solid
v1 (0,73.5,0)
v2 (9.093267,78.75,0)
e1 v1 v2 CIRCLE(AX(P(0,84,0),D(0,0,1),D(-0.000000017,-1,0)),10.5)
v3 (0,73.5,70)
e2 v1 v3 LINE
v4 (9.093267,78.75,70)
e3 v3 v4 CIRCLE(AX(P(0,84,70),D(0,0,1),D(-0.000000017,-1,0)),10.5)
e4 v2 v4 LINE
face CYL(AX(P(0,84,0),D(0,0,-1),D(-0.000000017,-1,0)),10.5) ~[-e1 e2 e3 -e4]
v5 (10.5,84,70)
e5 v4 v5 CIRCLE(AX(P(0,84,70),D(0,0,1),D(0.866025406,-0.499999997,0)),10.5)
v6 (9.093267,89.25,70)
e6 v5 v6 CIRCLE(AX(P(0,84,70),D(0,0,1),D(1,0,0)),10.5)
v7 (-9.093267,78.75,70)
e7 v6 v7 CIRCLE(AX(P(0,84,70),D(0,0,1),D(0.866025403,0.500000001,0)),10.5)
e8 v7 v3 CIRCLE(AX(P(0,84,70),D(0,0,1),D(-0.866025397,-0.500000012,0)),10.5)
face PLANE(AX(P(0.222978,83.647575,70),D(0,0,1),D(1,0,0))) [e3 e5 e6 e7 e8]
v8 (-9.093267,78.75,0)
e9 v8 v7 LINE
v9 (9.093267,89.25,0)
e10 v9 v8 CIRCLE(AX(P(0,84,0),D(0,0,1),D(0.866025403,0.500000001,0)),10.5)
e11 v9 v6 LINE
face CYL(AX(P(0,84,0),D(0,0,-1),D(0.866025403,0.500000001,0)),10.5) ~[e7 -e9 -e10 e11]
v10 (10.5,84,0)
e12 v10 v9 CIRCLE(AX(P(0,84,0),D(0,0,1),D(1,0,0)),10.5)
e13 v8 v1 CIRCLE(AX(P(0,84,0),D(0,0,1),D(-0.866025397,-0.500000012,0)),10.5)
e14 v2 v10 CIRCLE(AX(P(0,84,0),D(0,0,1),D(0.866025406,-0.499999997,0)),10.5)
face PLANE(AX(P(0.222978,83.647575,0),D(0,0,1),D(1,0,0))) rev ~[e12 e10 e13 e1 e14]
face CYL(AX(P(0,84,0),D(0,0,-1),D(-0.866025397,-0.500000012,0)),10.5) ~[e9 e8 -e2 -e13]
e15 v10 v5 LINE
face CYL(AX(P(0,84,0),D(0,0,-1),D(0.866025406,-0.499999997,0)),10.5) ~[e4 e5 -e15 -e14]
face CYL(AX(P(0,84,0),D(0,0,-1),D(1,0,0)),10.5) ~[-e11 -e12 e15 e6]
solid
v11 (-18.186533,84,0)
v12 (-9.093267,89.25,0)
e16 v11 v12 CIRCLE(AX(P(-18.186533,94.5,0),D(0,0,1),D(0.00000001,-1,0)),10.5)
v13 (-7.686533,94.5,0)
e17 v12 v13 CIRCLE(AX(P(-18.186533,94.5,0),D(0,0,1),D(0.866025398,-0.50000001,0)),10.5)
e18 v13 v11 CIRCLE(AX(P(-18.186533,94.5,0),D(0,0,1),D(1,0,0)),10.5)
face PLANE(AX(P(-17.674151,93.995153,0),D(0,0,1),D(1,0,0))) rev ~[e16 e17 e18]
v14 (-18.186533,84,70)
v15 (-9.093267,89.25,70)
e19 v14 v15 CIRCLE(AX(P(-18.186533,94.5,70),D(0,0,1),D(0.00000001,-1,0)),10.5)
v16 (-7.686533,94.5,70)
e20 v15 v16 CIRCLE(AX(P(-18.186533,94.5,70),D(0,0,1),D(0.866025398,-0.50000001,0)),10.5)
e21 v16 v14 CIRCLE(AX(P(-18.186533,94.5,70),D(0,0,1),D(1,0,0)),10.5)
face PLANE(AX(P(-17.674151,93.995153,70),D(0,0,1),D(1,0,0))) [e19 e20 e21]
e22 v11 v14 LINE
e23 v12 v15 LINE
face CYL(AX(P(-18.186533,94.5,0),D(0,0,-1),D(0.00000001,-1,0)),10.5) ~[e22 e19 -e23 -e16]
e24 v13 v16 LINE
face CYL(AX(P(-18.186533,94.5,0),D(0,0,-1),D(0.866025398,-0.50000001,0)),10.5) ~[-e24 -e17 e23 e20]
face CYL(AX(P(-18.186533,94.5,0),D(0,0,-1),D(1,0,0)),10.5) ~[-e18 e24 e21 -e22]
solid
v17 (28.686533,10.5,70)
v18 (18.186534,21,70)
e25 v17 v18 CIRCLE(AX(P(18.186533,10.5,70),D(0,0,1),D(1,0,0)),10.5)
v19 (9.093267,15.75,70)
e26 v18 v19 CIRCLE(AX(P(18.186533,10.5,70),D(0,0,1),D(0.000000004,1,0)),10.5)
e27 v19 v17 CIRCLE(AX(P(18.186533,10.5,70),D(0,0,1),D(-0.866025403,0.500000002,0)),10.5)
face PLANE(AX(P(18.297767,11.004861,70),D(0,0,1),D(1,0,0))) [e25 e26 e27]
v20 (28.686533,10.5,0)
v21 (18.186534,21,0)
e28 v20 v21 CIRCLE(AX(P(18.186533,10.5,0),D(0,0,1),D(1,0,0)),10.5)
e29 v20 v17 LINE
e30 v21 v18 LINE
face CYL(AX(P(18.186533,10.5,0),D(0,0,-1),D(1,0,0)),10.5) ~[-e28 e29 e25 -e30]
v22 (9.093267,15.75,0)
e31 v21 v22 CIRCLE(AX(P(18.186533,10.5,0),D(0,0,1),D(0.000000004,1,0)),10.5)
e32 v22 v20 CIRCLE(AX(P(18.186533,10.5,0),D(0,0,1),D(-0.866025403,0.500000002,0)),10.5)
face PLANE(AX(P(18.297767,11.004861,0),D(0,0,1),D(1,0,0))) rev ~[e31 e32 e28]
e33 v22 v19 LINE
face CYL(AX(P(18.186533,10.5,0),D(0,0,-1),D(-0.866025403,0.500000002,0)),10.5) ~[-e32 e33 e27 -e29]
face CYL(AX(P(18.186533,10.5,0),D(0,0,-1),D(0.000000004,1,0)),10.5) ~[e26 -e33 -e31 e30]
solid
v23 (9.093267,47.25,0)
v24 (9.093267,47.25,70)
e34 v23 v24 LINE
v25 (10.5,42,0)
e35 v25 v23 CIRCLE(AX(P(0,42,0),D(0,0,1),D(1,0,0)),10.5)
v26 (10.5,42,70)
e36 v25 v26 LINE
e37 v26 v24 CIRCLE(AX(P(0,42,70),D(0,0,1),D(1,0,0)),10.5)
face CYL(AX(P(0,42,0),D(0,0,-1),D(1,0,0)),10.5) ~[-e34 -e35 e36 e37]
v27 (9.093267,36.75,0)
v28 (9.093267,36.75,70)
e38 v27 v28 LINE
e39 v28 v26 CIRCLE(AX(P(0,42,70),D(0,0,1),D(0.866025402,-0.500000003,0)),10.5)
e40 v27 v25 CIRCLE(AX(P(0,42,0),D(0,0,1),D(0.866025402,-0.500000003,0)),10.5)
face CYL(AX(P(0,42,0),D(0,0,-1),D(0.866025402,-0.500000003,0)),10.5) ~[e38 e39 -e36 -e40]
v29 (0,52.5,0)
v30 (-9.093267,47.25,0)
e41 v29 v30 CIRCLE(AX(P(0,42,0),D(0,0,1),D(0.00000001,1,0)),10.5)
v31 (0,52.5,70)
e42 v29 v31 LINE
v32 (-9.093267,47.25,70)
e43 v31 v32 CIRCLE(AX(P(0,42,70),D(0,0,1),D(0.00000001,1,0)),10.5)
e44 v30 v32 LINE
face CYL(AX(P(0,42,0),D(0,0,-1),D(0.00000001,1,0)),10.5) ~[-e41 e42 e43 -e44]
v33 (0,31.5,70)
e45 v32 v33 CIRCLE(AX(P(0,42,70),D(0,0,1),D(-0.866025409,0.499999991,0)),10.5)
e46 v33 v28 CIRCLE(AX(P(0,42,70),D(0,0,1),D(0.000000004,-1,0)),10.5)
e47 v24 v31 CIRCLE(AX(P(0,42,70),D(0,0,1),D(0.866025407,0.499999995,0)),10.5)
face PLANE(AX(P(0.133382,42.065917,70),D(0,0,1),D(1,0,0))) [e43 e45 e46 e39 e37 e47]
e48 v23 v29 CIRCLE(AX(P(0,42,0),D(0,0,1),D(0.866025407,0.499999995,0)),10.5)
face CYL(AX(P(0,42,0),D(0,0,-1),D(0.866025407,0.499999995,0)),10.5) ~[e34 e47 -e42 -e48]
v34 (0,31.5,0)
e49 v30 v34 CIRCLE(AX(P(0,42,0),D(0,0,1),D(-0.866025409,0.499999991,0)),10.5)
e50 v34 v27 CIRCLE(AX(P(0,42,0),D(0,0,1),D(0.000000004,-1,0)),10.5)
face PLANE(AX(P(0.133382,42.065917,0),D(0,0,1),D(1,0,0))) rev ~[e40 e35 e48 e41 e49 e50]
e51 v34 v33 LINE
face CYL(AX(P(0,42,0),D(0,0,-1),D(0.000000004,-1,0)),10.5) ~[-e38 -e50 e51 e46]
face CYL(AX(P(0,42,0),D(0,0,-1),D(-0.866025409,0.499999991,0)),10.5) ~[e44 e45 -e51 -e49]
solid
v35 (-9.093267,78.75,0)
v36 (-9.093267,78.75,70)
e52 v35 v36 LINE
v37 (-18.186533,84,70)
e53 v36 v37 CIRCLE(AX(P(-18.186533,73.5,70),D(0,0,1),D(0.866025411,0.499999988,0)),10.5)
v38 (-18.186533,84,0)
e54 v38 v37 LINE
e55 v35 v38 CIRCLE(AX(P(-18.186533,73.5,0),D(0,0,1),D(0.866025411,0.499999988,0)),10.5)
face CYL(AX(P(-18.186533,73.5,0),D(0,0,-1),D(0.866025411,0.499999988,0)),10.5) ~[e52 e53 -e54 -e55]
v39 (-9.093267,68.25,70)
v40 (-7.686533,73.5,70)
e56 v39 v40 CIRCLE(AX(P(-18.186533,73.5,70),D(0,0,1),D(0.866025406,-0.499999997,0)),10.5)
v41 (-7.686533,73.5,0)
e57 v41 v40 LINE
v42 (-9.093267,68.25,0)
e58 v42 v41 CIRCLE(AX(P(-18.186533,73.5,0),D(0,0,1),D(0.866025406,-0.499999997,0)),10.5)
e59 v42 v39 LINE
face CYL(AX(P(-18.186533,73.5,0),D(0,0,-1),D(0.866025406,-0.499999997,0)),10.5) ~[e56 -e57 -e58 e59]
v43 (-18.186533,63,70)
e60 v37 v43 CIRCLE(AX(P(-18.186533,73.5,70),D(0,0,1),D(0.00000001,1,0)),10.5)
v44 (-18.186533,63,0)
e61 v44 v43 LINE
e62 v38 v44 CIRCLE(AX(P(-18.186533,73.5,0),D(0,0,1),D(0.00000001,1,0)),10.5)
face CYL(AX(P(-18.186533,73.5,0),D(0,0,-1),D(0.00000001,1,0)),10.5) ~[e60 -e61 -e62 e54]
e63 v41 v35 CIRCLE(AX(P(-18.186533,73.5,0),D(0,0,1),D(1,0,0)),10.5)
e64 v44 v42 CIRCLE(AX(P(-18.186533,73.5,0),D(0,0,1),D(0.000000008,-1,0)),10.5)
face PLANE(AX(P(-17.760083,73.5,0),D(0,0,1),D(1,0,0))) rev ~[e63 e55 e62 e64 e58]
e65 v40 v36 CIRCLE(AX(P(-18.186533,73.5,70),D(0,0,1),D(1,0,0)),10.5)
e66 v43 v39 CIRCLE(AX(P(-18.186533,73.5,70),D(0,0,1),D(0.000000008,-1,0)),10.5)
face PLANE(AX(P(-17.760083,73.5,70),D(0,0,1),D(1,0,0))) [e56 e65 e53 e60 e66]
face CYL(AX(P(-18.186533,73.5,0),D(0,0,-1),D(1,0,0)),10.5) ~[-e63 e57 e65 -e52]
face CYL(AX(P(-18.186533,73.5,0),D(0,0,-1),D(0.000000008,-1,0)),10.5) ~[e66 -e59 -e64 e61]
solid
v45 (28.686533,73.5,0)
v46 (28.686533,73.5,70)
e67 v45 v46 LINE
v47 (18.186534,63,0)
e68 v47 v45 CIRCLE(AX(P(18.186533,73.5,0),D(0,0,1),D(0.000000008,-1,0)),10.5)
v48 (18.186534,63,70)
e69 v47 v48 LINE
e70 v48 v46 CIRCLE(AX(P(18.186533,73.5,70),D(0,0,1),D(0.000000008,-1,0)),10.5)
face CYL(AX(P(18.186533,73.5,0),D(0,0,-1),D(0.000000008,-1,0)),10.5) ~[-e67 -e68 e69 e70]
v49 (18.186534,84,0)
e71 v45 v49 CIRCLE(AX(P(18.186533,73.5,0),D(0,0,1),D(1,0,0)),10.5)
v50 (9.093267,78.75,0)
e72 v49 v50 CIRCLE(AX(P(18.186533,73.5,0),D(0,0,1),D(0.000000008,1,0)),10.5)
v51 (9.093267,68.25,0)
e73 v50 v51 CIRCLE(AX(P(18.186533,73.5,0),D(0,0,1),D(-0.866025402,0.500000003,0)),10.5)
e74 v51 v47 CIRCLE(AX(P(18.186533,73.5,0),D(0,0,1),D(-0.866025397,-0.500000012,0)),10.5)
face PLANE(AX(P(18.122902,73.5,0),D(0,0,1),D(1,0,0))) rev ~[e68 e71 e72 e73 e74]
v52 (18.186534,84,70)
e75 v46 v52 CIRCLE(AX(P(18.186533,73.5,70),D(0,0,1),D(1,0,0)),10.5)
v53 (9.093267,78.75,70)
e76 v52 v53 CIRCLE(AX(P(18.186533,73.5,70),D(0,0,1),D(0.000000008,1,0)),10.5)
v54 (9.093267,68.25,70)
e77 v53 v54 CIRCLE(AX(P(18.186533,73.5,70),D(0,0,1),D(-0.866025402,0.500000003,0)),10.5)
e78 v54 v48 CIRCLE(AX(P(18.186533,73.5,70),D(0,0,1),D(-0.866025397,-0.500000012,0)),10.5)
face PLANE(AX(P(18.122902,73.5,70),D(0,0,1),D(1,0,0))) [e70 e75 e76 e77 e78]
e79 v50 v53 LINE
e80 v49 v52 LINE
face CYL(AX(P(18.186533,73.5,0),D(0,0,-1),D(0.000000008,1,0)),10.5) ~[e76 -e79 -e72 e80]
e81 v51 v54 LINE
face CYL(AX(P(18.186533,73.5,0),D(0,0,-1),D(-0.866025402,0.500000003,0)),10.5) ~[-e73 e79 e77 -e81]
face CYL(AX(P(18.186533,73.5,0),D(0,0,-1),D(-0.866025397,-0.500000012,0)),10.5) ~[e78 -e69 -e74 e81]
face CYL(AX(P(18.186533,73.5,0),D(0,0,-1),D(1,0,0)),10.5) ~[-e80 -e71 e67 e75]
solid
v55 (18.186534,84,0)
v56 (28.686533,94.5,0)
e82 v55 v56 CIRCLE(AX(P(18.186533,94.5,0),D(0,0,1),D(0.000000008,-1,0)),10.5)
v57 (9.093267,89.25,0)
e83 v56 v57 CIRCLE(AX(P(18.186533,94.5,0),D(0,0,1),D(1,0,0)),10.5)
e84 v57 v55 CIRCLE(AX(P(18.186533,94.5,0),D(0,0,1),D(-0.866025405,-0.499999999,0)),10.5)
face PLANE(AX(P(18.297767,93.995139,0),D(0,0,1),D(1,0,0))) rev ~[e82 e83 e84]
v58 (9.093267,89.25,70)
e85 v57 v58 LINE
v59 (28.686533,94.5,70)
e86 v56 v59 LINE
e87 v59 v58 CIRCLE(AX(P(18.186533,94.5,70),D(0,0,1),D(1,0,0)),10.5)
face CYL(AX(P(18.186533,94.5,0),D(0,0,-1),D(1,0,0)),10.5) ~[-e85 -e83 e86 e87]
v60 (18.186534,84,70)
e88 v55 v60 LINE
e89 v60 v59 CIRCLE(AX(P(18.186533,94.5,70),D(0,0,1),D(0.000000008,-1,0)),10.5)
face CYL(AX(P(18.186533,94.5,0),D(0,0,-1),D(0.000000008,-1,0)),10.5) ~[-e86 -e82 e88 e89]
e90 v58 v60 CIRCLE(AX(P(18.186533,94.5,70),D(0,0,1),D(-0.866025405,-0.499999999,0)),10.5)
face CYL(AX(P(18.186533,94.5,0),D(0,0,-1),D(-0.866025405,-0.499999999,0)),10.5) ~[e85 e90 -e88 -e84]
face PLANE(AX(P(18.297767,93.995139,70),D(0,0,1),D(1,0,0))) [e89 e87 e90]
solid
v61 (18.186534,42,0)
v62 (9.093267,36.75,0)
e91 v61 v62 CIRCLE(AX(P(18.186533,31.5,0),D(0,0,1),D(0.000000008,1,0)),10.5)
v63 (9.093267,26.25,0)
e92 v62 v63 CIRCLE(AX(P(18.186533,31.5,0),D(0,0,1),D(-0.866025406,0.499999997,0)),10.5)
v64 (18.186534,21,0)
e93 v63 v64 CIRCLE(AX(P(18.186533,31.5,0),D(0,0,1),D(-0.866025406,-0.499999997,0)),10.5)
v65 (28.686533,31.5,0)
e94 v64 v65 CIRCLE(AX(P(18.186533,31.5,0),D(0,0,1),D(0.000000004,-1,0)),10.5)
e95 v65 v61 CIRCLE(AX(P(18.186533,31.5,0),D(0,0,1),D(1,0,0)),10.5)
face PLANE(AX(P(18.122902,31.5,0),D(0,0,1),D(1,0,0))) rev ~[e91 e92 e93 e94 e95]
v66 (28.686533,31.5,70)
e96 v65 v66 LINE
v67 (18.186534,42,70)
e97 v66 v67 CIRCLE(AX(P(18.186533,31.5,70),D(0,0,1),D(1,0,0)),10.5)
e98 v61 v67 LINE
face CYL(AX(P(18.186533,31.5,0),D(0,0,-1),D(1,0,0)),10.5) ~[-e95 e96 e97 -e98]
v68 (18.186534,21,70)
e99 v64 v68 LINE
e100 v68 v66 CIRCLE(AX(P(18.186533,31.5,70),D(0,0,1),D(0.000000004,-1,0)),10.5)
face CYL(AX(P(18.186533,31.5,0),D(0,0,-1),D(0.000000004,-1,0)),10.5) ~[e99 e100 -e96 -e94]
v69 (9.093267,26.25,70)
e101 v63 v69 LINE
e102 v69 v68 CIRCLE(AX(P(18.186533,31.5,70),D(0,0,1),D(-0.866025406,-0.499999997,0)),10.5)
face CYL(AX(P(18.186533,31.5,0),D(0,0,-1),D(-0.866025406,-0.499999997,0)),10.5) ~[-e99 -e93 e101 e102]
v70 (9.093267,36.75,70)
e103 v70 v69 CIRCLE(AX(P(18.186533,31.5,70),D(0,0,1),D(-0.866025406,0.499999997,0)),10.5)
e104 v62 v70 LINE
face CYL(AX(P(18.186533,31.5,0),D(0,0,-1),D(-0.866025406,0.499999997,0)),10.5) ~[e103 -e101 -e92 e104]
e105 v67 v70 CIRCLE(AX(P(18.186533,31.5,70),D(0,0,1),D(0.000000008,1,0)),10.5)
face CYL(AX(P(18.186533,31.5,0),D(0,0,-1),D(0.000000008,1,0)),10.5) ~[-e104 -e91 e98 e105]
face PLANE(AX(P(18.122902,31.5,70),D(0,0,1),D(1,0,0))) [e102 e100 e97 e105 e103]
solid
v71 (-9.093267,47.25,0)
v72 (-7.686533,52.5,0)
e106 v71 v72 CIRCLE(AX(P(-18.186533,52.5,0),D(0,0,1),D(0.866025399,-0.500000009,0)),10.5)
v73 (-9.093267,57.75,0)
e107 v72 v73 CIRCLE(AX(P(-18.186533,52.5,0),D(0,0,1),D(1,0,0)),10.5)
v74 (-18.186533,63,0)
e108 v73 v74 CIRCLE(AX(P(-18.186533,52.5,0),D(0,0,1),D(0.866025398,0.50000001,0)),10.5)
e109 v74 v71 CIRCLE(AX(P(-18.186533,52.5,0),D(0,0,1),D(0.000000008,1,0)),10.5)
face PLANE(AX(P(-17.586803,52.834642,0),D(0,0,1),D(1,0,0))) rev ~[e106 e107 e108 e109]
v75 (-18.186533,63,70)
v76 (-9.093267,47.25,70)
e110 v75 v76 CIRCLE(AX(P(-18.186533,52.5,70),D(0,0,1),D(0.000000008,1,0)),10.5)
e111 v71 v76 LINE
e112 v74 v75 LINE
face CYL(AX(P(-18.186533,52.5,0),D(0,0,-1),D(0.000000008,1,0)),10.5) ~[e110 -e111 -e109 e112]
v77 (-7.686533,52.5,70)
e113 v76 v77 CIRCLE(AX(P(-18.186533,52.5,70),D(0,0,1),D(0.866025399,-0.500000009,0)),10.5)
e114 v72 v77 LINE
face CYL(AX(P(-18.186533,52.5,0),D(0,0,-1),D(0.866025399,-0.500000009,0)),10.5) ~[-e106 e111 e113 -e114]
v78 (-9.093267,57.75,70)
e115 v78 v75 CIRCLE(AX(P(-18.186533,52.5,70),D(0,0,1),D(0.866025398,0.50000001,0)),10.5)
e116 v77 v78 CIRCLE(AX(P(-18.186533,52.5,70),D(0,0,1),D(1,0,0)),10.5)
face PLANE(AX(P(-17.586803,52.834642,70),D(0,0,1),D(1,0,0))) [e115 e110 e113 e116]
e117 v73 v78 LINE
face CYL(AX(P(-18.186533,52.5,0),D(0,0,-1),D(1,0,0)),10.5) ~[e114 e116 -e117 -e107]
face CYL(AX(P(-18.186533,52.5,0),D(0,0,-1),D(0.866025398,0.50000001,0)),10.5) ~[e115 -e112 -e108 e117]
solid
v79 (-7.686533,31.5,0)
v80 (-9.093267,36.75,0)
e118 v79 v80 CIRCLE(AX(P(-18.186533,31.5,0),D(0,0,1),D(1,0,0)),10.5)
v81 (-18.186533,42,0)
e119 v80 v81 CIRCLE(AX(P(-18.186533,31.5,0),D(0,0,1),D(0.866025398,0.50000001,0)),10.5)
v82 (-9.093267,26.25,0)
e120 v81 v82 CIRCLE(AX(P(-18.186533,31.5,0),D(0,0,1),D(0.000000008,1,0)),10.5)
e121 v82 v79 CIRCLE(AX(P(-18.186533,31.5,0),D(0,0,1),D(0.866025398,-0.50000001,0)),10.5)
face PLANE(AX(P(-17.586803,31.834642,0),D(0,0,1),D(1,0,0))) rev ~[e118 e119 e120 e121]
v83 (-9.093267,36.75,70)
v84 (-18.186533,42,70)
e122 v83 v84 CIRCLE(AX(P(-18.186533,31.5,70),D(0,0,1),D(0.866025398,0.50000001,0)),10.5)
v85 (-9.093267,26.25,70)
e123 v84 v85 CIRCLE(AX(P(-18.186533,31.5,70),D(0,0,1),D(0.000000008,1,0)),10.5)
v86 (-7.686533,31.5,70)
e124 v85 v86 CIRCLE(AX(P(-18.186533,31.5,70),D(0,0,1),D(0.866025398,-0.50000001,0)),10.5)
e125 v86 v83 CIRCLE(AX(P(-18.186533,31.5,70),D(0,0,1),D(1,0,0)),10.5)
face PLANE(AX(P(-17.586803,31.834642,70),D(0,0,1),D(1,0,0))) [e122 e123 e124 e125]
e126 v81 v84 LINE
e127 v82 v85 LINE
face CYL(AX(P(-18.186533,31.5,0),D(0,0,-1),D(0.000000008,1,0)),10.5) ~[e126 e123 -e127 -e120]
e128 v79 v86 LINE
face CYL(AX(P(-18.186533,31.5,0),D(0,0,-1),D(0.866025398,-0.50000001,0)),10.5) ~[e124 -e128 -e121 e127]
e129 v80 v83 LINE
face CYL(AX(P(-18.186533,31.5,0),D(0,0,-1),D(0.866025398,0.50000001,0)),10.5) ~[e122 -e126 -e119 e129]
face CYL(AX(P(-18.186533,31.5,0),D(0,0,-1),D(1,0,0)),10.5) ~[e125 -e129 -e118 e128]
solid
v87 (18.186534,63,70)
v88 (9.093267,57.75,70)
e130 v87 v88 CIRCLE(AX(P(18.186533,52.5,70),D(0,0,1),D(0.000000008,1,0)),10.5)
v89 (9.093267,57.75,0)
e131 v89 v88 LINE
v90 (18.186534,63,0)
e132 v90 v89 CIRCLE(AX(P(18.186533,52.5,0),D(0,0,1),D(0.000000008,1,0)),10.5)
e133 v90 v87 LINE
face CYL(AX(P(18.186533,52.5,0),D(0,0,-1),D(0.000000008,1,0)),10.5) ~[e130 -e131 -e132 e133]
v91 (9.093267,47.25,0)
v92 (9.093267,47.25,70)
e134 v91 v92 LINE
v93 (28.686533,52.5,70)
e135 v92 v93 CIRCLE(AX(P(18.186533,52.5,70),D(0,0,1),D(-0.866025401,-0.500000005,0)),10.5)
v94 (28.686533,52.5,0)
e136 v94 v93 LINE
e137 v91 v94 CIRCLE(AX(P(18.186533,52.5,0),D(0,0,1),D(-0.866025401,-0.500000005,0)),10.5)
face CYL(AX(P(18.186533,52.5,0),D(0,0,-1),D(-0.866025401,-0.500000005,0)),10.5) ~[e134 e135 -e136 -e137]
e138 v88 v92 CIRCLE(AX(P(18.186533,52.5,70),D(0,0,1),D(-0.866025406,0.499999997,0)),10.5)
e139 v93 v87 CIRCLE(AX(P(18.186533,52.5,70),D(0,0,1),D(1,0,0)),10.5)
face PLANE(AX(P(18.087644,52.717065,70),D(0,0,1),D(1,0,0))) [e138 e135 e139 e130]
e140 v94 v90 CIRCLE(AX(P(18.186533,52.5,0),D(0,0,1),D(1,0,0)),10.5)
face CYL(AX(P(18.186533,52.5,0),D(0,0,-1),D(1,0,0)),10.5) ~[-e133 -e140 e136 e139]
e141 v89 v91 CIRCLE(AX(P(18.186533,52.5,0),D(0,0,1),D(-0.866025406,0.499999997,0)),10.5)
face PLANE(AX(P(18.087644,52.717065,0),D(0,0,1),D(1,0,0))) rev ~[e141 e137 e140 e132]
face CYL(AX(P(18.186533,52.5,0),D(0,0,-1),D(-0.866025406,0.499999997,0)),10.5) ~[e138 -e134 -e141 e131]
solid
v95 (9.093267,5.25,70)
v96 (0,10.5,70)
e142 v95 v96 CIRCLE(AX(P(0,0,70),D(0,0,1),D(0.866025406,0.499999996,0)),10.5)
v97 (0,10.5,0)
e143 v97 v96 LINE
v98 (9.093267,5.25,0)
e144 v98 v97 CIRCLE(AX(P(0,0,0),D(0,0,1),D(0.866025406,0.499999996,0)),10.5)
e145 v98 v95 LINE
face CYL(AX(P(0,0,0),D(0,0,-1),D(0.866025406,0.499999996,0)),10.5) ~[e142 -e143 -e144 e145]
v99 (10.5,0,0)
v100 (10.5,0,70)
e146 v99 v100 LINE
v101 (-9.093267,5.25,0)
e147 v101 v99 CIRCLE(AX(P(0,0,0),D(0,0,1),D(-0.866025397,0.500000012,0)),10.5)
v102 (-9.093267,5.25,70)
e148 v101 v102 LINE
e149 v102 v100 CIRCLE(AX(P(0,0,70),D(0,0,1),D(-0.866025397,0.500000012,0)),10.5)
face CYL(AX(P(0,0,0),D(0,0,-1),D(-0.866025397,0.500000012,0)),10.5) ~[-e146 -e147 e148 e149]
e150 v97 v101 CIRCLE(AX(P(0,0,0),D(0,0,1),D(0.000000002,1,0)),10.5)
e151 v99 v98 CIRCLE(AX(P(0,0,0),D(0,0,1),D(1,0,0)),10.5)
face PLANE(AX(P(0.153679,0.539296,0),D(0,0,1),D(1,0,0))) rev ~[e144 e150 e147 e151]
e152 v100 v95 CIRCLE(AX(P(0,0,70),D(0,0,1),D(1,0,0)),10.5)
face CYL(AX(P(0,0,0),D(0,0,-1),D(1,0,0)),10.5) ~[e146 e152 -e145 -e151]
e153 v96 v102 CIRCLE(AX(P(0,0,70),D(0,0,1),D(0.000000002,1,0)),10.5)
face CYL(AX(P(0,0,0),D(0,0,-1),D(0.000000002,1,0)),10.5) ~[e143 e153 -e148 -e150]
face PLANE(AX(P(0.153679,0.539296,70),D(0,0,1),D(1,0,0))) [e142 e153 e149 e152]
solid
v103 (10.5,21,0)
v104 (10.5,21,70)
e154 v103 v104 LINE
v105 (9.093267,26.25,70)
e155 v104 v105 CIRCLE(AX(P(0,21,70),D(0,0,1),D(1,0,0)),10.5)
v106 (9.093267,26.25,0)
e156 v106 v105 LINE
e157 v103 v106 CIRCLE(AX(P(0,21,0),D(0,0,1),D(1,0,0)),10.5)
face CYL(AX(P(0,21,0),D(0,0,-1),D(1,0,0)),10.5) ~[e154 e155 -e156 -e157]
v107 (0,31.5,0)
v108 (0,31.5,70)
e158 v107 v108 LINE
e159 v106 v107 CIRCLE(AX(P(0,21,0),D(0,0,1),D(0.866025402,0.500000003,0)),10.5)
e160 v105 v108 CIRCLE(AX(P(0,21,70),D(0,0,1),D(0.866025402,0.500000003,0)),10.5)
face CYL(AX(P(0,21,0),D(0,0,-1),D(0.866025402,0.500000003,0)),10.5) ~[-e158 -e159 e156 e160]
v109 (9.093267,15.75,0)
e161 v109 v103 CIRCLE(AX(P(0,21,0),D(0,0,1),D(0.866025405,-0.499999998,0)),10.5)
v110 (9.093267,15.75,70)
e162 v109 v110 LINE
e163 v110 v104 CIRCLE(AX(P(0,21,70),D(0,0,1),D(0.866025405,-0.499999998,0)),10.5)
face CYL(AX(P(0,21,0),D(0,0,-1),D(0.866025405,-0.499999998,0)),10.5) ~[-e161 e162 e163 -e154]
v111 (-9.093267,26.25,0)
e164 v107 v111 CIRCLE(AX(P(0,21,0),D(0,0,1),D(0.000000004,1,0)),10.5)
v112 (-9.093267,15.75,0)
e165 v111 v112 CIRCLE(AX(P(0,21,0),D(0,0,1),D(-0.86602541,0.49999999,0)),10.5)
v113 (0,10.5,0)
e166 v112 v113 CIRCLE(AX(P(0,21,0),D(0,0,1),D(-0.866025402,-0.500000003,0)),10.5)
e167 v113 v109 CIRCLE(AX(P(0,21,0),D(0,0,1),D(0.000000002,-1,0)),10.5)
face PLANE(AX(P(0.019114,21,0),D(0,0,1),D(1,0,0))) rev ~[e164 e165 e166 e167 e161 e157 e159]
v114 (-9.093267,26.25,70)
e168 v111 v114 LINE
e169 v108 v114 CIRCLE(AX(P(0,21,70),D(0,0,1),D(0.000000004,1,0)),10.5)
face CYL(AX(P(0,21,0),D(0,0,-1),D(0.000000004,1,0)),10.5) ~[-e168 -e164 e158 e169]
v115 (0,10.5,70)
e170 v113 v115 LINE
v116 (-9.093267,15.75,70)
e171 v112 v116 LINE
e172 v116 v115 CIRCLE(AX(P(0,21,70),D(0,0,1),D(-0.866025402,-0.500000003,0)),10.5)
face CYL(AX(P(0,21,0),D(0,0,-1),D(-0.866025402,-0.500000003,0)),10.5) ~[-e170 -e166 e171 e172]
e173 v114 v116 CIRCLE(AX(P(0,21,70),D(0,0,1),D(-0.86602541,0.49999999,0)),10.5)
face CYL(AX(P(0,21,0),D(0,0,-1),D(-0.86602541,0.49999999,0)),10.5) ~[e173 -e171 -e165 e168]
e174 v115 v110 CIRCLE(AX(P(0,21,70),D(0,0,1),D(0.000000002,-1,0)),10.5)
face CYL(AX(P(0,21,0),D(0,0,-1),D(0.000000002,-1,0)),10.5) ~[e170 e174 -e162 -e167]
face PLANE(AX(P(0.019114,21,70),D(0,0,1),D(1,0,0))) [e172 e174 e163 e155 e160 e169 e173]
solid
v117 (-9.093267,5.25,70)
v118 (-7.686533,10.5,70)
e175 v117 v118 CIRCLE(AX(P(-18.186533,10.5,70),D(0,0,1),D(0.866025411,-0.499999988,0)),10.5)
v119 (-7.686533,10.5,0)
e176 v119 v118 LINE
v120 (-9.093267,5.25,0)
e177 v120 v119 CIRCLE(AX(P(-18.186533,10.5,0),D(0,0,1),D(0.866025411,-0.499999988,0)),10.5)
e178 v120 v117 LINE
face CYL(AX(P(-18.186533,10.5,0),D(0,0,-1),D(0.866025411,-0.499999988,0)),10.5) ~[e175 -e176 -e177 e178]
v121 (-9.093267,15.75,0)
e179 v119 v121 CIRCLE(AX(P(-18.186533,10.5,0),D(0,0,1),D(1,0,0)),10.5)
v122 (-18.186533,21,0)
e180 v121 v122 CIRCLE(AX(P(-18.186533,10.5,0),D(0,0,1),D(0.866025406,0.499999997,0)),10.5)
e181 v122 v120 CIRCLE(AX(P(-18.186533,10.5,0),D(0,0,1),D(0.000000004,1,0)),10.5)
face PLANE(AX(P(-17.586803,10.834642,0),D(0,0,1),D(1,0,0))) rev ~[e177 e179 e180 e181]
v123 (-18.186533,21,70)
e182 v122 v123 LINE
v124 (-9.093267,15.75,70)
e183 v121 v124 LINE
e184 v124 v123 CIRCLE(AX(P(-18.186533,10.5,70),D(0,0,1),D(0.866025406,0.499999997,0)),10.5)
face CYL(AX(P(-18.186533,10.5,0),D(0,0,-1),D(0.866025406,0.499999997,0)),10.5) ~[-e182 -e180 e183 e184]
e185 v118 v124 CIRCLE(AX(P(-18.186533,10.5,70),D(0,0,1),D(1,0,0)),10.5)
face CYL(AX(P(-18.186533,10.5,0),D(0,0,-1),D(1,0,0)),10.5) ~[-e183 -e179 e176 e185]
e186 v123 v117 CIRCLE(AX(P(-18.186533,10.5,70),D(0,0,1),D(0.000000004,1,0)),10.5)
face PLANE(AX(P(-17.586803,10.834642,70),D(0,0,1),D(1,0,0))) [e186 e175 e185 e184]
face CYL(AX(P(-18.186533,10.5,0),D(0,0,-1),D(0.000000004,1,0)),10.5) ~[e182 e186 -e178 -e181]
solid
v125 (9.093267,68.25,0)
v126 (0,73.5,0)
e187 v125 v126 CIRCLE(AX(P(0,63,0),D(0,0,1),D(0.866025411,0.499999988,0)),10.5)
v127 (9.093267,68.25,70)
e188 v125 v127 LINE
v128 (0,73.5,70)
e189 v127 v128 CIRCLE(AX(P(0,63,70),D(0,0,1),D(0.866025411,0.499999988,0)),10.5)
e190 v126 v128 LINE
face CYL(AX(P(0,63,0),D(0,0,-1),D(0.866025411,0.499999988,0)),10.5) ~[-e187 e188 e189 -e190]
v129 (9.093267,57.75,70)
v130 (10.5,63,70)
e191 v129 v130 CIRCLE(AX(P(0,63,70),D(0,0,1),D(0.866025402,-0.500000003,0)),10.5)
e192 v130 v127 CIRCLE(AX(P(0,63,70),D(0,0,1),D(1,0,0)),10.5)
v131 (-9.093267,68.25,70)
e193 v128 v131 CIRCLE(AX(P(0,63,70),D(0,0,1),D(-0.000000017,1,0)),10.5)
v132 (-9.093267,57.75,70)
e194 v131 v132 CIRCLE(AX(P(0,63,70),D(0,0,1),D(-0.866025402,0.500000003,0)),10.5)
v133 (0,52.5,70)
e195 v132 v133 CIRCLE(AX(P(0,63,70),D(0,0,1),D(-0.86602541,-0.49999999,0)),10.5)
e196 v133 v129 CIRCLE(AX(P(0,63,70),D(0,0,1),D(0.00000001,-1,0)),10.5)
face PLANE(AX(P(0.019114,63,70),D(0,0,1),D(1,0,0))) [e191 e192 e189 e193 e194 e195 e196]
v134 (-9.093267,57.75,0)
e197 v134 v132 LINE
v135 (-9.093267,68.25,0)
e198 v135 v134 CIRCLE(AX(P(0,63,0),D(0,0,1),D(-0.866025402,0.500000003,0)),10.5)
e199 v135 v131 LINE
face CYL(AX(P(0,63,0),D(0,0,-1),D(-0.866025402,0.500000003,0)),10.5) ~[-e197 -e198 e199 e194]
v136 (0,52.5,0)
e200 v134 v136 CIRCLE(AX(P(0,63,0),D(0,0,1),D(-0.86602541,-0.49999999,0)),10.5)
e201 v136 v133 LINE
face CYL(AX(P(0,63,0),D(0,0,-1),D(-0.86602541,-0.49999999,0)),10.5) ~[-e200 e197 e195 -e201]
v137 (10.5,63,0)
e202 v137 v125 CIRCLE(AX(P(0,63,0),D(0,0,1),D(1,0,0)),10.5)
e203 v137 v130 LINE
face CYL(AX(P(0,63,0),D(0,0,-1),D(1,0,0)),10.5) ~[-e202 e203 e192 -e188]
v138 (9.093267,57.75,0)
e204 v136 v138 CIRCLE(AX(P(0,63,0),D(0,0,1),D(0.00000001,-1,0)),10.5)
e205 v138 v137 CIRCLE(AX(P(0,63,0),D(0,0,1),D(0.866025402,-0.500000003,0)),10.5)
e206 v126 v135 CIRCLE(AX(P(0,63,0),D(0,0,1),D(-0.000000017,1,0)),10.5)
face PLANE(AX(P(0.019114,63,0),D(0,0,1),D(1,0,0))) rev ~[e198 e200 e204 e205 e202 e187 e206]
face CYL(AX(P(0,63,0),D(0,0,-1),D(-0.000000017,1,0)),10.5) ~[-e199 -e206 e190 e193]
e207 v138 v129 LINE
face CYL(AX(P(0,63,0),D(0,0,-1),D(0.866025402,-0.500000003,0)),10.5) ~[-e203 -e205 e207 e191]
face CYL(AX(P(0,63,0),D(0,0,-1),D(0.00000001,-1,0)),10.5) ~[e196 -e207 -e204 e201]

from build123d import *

# Parameters (mm, degrees)
F1_DEPTH = 70


# Not quite as in the source:
# - a feature names something its author has since deleted; it is built from what else it names


with BuildPart() as f1:
    # F0 (on Top) → F1 (new body)
    with BuildSketch(Plane.XY):
        with BuildLine():
            ThreePointArc((-9.0932666667, 5.2500001264), (-2.7176000441, -10.1422211571), (10.5, 0))
            ThreePointArc((10.5, 0), (10.1422211824, 2.71759995), (9.0932667642, 5.2499999577))
            ThreePointArc((9.0932667642, 5.2499999577), (5.2500000295, 9.0932667227), (1.93e-08, 10.5))
            ThreePointArc((1.93e-08, 10.5), (-5.2499999284, 9.0932667811), (-9.0932666667, 5.2500001264))
        make_face()
    extrude(amount=F1_DEPTH)


with BuildPart() as f1b:
    # F0 (on Top) → F1, piece 2 (new body)
    with BuildSketch(Plane.XY):
        with BuildLine():
            ThreePointArc((9.0932667504, 15.7500000185), (7.6865334795, 10.4999999862), (9.0932667642, 5.2499999577))
            ThreePointArc((9.0932667642, 5.2499999577), (20.9041334767, 0.3577788303), (28.6865334795, 10.5))
            ThreePointArc((28.6865334795, 10.5), (25.6111546956, 17.9246211888), (18.1865335182, 21))
            ThreePointArc((18.1865335182, 21), (12.9365335055, 19.5932667547), (9.0932667504, 15.7500000185))
        make_face()
    extrude(amount=F1_DEPTH)


with BuildPart() as f1c:
    # F0 (on Top) → F1, piece 3 (new body)
    with BuildSketch(Plane.XY):
        with BuildLine():
            ThreePointArc((-18.1865334408, 21), (-27.2798001924, 5.2499999535), (-9.0932666667, 5.2500001264))
            ThreePointArc((-9.0932666667, 5.2500001264), (-8.0443122845, 7.7824000969), (-7.6865334795, 10.5))
            ThreePointArc((-7.6865334795, 10.5), (-8.0443122981, 13.2175999536), (-9.0932667191, 15.7499999643))
            ThreePointArc((-9.0932667191, 15.7499999643), (-12.9365334449, 19.5932667197), (-18.1865334408, 21))
        make_face()
    extrude(amount=F1_DEPTH)


with BuildPart() as f1d:
    # F0 (on Top) → F1, piece 4 (new body)
    with BuildSketch(Plane.XY):
        with BuildLine():
            ThreePointArc((-9.0932667191, 15.7499999643), (-5.2499999738, 11.9067332451), (1.93e-08, 10.5))
            ThreePointArc((1.93e-08, 10.5), (5.2500000176, 11.9067332704), (9.0932667504, 15.7500000185))
            ThreePointArc((9.0932667504, 15.7500000185), (10.1422211788, 18.2824000367), (10.5, 21))
            ThreePointArc((10.5, 21), (10.1422211707, 23.7175999935), (9.0932667191, 26.2500000357))
            ThreePointArc((9.0932667191, 26.2500000357), (5.2499999989, 30.0932667404), (3.87e-08, 31.5))
            ThreePointArc((3.87e-08, 31.5), (-5.2500000363, 30.0932667188), (-9.093266801, 26.2499998939))
            ThreePointArc((-9.093266801, 26.2499998939), (-10.5, 20.9999999181), (-9.0932667191, 15.7499999643))
        make_face()
    extrude(amount=F1_DEPTH)


with BuildPart() as f1e:
    # F0 (on Top) → F1, piece 5 (new body)
    with BuildSketch(Plane.XY):
        with BuildLine():
            ThreePointArc((-18.1865333975, 42), (-28.6865334795, 31.5000000216), (-18.1865334408, 21))
            ThreePointArc((-18.1865334408, 21), (-12.9365335158, 22.4067332393), (-9.093266801, 26.2499998939))
            ThreePointArc((-9.093266801, 26.2499998939), (-8.0443123193, 28.7823999672), (-7.6865334795, 31.5))
            ThreePointArc((-7.6865334795, 31.5), (-8.0443123193, 34.2176000328), (-9.093266801, 36.7500001061))
            ThreePointArc((-9.093266801, 36.7500001061), (-12.9365334971, 40.5932667499), (-18.1865333975, 42))
        make_face()
    extrude(amount=F1_DEPTH)


with BuildPart() as f1f:
    # F0 (on Top) → F1, piece 6 (new body)
    with BuildSketch(Plane.XY):
        with BuildLine():
            ThreePointArc((9.0932667191, 26.2500000357), (12.9365334784, 22.4067332609), (18.1865335182, 21))
            ThreePointArc((18.1865335182, 21), (25.6111546956, 24.0753788112), (28.6865334795, 31.5))
            ThreePointArc((28.6865334795, 31.5), (25.6111547109, 38.9246211735), (18.1865335614, 42))
            ThreePointArc((18.1865335614, 42), (12.9365334971, 40.5932667499), (9.0932667191, 36.7499999643))
            ThreePointArc((9.0932667191, 36.7499999643), (7.6865334795, 31.5), (9.0932667191, 26.2500000357))
        make_face()
    extrude(amount=F1_DEPTH)


with BuildPart() as f1g:
    # F0 (on Top) → F1, piece 7 (new body)
    with BuildSketch(Plane.XY):
        with BuildLine():
            ThreePointArc((-18.1865333975, 63), (-28.6865334795, 52.5), (-18.1865333975, 42))
            ThreePointArc((-18.1865333975, 42), (-12.9365334907, 43.4067332538), (-9.0932667937, 47.2499999066))
            ThreePointArc((-9.0932667937, 47.2499999066), (-8.0443123174, 49.7823999743), (-7.6865334795, 52.5))
            ThreePointArc((-7.6865334795, 52.5), (-8.0443123193, 55.2176000328), (-9.093266801, 57.7500001061))
            ThreePointArc((-9.093266801, 57.7500001061), (-12.9365334971, 61.5932667499), (-18.1865333975, 63))
        make_face()
    extrude(amount=F1_DEPTH)


with BuildPart() as f1h:
    # F0 (on Top) → F1, piece 8 (new body)
    with BuildSketch(Plane.XY):
        with BuildLine():
            ThreePointArc((-9.0932667937, 47.2499999066), (-10.5, 42.0000000074), (-9.093266801, 36.7500001061))
            ThreePointArc((-9.093266801, 36.7500001061), (-5.2500000363, 32.9067332812), (3.87e-08, 31.5))
            ThreePointArc((3.87e-08, 31.5), (5.2499999989, 32.9067332596), (9.0932667191, 36.7499999643))
            ThreePointArc((9.0932667191, 36.7499999643), (10.1422211707, 39.2824000065), (10.5, 42))
            ThreePointArc((10.5, 42), (10.1422211838, 44.7175999446), (9.0932667697, 47.2499999481))
            ThreePointArc((9.0932667697, 47.2499999481), (5.2500000697, 51.0932666995), (1.009e-07, 52.5))
            ThreePointArc((1.009e-07, 52.5), (-5.250000003, 51.093266738), (-9.0932667937, 47.2499999066))
        make_face()
    extrude(amount=F1_DEPTH)


with BuildPart() as f1i:
    # F0 (on Top) → F1, piece 9 (new body)
    with BuildSketch(Plane.XY):
        with BuildLine():
            ThreePointArc((-18.1865333708, 84), (-28.6865334795, 73.5000000134), (-18.1865333975, 63))
            ThreePointArc((-18.1865333975, 63), (-12.9365334261, 64.4067332911), (-9.0932667191, 68.2500000357))
            ThreePointArc((-9.0932667191, 68.2500000357), (-8.0443122981, 70.7824000464), (-7.6865334795, 73.5))
            ThreePointArc((-7.6865334795, 73.5), (-8.0443122842, 76.2175999018), (-9.0932666654, 78.7499998713))
            ThreePointArc((-9.0932666654, 78.7499998713), (-12.936533368, 82.5932666754), (-18.1865333708, 84))
        make_face()
    extrude(amount=F1_DEPTH)


with BuildPart() as f1j:
    # F0 (on Top) → F1, piece 10 (new body)
    with BuildSketch(Plane.XY):
        with BuildLine():
            ThreePointArc((9.0932667697, 47.2499999481), (12.9365335409, 43.4067332248), (18.1865335614, 42))
            ThreePointArc((18.1865335614, 42), (25.6111547109, 45.0753788265), (28.6865334795, 52.5))
            ThreePointArc((28.6865334795, 52.5), (25.6111547109, 59.9246211735), (18.1865335614, 63))
            ThreePointArc((18.1865335614, 63), (12.9365334971, 61.5932667499), (9.0932667191, 57.7499999643))
            ThreePointArc((9.0932667191, 57.7499999643), (7.6865334795, 52.4999999494), (9.0932667697, 47.2499999481))
        make_face()
    extrude(amount=F1_DEPTH)


with BuildPart() as f1k:
    # F0 (on Top) → F1, piece 11 (new body)
    with BuildSketch(Plane.XY):
        with BuildLine():
            ThreePointArc((-9.0932667191, 68.2500000357), (-10.5, 63.0000000819), (-9.093266801, 57.7500001061))
            ThreePointArc((-9.093266801, 57.7500001061), (-5.2500000094, 53.9067332657), (1.009e-07, 52.5))
            ThreePointArc((1.009e-07, 52.5), (5.2500000258, 53.9067332752), (9.0932667191, 57.7499999643))
            ThreePointArc((9.0932667191, 57.7499999643), (10.1422211707, 60.2824000065), (10.5, 63))
            ThreePointArc((10.5, 63), (10.1422211953, 65.7175999018), (9.093266814, 68.2499998713))
            ThreePointArc((9.093266814, 68.2499998713), (5.249999985, 72.0932667484), (-1.832e-07, 73.5))
            ThreePointArc((-1.832e-07, 73.5), (-5.2500000615, 72.0932667042), (-9.0932667191, 68.2500000357))
        make_face()
    extrude(amount=F1_DEPTH)


with BuildPart() as f1l:
    # F0 (on Top) → F1, piece 12 (new body)
    with BuildSketch(Plane.XY):
        with BuildLine():
            ThreePointArc((-7.6865334795, 94.5), (-25.6111547204, 101.924621164), (-18.1865333708, 84))
            ThreePointArc((-18.1865333708, 84), (-12.9365334855, 85.4067332568), (-9.093266801, 89.2499998939))
            ThreePointArc((-9.093266801, 89.2499998939), (-8.0443123193, 91.7823999672), (-7.6865334795, 94.5))
        make_face()
    extrude(amount=F1_DEPTH)


with BuildPart() as f1m:
    # F0 (on Top) → F1, piece 13 (new body)
    with BuildSketch(Plane.XY):
        with BuildLine():
            ThreePointArc((-9.093266801, 89.2499998939), (-10.5, 83.9999998644), (-9.0932666654, 78.7499998713))
            ThreePointArc((-9.0932666654, 78.7499998713), (-5.250000015, 74.9067332689), (-1.832e-07, 73.5))
            ThreePointArc((-1.832e-07, 73.5), (5.2499999385, 74.9067332248), (9.0932667604, 78.7500000357))
            ThreePointArc((9.0932667604, 78.7500000357), (10.1422211814, 81.2824000464), (10.5, 84))
            ThreePointArc((10.5, 84), (10.1422211739, 86.7175999816), (9.0932667315, 89.2500000143))
            ThreePointArc((9.0932667315, 89.2500000143), (-6.95e-08, 94.5), (-9.093266801, 89.2499998939))
        make_face()
    extrude(amount=F1_DEPTH)


with BuildPart() as f1n:
    # F0 (on Top) → F1, piece 14 (new body)
    with BuildSketch(Plane.XY):
        with BuildLine():
            ThreePointArc((9.093266814, 68.2499998713), (12.9365335793, 64.4067332026), (18.1865335614, 63))
            ThreePointArc((18.1865335614, 63), (25.6111547109, 66.0753788265), (28.6865334795, 73.5))
            ThreePointArc((28.6865334795, 73.5), (25.6111547119, 80.9246211725), (18.1865335643, 84))
            ThreePointArc((18.1865335643, 84), (12.9365335341, 82.5932667713), (9.0932667604, 78.7500000357))
            ThreePointArc((9.0932667604, 78.7500000357), (7.6865334795, 73.4999999463), (9.093266814, 68.2499998713))
        make_face()
    extrude(amount=F1_DEPTH)


with BuildPart() as f1o:
    # F0 (on Top) → F1, piece 15 (new body)
    with BuildSketch(Plane.XY):
        with BuildLine():
            ThreePointArc((28.6865334795, 94.5), (15.4689335139, 104.6422211782), (9.0932667315, 89.2500000143))
            ThreePointArc((9.0932667315, 89.2500000143), (12.9365335091, 85.4067332432), (18.1865335643, 84))
            ThreePointArc((18.1865335643, 84), (25.6111547119, 87.0753788275), (28.6865334795, 94.5))
        make_face()
    extrude(amount=F1_DEPTH)


solid = Compound([f1.part, f1b.part, f1c.part, f1d.part, f1e.part, f1f.part, f1g.part, f1h.part, f1i.part, f1j.part, f1k.part, f1l.part, f1m.part, f1n.part, f1o.part])
